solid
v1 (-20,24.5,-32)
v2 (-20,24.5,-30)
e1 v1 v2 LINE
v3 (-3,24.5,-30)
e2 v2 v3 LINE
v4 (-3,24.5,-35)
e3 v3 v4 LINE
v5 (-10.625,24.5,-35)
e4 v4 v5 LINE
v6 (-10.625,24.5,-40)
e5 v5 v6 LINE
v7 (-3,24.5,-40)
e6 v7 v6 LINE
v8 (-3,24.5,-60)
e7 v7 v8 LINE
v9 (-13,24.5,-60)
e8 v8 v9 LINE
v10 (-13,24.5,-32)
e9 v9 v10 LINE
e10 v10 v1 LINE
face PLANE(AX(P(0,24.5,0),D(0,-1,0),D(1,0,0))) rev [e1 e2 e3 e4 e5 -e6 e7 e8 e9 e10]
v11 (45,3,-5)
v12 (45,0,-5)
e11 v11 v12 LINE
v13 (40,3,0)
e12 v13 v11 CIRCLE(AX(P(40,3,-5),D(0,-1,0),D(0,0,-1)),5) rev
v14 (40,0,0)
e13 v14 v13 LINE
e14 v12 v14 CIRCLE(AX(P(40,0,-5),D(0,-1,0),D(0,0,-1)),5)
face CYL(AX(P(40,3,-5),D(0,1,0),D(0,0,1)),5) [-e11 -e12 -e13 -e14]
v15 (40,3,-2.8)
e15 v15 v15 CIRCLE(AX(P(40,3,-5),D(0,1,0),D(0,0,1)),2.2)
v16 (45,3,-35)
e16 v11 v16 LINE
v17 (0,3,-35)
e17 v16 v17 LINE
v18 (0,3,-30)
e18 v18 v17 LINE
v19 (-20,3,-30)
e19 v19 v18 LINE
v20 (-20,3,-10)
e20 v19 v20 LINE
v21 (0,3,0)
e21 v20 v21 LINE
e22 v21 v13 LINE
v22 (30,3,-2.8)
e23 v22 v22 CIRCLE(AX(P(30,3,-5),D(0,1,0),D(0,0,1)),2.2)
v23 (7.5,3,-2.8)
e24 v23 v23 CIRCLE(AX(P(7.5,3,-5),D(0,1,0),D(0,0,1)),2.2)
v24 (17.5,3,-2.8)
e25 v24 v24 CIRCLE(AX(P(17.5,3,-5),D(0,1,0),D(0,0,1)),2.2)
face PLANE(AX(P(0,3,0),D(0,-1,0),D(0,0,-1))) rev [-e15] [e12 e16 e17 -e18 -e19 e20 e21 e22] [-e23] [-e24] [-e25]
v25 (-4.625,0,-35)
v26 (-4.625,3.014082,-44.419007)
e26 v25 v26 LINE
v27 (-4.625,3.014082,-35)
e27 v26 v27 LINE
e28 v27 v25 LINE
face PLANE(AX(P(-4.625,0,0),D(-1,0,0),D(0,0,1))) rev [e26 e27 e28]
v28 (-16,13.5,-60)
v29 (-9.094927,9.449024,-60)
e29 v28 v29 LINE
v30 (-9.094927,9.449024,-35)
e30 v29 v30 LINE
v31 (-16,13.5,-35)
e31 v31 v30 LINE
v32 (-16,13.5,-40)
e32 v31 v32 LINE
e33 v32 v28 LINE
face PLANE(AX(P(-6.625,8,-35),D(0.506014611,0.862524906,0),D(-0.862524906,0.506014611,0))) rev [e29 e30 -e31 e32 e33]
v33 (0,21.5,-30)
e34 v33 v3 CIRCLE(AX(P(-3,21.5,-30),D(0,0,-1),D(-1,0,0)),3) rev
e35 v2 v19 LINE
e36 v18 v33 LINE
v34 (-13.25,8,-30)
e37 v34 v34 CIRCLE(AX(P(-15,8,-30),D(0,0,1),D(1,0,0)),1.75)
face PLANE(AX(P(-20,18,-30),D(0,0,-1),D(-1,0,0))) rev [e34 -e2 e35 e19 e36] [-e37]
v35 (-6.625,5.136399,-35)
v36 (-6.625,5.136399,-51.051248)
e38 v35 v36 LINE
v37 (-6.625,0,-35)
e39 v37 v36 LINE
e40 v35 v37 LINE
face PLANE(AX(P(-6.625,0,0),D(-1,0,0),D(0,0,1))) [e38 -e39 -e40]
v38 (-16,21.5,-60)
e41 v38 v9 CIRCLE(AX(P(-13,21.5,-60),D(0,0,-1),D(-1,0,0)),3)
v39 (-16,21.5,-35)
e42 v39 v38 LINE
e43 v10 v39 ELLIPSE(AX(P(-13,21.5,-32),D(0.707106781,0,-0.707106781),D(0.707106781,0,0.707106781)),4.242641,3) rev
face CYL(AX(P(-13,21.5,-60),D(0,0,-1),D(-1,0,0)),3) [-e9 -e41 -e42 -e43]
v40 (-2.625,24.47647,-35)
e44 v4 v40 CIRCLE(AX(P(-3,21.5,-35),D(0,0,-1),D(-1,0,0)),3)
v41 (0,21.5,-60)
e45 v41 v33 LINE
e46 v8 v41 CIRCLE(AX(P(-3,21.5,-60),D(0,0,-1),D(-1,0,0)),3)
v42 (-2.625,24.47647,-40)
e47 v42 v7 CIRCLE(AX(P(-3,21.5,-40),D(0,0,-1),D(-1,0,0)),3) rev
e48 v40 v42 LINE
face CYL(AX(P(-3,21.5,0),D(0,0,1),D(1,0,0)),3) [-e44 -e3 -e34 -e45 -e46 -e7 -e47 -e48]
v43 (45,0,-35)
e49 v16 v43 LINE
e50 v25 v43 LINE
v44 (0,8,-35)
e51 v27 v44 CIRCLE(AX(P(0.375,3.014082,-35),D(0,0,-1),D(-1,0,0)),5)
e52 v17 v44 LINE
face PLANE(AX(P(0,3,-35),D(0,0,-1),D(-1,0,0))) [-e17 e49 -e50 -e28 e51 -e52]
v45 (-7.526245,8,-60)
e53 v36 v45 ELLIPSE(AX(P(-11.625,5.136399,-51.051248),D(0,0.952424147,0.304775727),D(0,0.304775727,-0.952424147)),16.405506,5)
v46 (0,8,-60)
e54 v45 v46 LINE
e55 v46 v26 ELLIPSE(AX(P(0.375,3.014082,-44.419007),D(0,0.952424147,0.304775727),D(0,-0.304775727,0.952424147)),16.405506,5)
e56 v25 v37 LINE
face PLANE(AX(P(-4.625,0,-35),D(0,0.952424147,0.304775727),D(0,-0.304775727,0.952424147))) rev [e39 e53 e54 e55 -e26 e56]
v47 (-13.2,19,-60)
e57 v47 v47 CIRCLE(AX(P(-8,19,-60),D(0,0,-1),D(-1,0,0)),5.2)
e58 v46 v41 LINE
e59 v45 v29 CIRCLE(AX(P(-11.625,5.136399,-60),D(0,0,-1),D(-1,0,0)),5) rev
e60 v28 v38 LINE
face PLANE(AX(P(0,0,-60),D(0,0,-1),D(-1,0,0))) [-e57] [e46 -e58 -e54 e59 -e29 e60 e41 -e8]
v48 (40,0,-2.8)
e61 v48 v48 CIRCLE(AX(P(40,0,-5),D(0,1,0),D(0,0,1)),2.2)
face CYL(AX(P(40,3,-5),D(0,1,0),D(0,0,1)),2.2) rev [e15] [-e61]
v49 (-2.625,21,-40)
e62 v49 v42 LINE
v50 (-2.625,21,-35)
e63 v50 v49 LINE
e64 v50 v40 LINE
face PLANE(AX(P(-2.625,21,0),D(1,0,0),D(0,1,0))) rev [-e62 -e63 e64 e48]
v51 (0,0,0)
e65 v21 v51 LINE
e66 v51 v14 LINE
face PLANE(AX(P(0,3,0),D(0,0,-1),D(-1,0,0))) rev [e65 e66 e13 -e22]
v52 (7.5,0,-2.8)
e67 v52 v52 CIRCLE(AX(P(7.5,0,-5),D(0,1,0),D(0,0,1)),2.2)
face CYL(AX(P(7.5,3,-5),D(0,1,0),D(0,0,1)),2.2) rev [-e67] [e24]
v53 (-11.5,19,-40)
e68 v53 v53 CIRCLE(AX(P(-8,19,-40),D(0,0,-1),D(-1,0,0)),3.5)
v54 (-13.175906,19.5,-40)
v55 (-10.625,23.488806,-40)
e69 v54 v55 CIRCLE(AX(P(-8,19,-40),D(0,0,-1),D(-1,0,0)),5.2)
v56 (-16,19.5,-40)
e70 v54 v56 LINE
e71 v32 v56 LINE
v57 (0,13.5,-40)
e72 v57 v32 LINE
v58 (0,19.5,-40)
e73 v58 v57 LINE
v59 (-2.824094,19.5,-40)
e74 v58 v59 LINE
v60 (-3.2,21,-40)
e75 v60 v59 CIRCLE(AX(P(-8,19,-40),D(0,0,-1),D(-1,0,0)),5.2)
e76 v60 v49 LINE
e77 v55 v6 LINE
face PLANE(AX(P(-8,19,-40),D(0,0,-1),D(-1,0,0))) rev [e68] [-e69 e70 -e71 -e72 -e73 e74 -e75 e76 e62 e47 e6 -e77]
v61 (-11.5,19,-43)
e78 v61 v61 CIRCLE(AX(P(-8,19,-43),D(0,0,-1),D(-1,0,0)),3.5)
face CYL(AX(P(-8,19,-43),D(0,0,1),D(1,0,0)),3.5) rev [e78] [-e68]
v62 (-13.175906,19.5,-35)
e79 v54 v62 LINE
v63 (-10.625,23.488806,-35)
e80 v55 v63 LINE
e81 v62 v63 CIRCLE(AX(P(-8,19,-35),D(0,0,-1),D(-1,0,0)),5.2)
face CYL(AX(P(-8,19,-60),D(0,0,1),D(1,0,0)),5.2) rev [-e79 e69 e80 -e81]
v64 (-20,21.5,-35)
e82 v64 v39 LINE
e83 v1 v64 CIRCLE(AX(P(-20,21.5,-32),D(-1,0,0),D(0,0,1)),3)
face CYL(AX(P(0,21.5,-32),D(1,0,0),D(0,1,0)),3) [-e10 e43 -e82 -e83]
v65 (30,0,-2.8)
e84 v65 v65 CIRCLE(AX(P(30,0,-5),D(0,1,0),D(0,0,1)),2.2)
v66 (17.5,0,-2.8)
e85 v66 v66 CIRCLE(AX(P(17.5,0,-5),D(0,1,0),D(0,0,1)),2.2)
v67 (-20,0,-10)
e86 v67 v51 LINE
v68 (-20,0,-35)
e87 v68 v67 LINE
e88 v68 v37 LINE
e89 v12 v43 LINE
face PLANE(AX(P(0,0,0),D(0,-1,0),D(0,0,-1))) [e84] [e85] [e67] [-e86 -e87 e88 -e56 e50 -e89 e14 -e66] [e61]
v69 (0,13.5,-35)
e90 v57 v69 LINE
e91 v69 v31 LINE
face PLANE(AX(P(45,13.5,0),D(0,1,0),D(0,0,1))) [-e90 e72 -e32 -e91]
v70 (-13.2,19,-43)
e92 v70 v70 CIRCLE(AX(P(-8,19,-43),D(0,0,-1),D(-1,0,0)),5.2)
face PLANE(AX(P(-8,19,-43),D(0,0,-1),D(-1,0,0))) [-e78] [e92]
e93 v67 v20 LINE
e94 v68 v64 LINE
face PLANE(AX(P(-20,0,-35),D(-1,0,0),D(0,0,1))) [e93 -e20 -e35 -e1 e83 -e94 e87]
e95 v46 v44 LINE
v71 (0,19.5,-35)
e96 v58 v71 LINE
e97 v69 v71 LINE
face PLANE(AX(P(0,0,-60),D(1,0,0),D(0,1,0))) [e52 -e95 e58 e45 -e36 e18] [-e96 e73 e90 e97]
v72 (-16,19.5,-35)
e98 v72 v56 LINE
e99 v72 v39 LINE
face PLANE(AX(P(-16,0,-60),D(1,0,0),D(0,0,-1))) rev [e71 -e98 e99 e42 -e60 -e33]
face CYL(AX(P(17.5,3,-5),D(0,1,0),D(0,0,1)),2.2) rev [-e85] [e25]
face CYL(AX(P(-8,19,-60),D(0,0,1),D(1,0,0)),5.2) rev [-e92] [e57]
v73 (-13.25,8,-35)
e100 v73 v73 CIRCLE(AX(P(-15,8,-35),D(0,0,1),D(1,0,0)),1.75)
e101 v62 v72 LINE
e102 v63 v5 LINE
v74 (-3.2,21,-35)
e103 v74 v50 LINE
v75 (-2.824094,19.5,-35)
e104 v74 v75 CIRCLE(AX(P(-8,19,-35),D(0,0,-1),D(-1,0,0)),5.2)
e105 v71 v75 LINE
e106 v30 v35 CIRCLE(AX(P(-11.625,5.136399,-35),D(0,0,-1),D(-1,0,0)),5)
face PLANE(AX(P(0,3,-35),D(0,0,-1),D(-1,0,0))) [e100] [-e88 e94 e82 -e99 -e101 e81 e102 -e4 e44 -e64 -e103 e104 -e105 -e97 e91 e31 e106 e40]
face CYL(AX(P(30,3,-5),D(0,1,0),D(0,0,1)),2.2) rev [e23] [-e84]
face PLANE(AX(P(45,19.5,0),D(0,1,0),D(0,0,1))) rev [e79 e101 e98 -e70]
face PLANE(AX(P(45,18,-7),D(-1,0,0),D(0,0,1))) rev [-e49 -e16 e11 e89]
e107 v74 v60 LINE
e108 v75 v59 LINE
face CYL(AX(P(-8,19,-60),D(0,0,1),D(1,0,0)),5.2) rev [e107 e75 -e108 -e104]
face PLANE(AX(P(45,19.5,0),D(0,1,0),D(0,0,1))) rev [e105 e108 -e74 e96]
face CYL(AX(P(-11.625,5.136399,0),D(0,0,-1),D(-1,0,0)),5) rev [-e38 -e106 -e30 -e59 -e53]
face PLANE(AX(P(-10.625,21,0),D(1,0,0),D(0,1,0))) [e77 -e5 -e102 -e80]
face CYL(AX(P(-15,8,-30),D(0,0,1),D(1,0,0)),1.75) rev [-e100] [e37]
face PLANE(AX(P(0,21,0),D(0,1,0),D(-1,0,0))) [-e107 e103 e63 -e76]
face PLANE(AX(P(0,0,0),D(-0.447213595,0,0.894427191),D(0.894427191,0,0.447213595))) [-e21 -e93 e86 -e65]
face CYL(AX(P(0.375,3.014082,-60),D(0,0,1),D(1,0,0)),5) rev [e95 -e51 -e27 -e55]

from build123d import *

# Parameters (mm, degrees)
SKETCH_4_W              = 25
SKETCH_4_H              = 10
EXTRUDE_1_DEPTH         = 3
HOLE_WIZARD_4_4_4_4_1_D = 4.4
SKETCH_8_W              = 65
SKETCH_8_H              = 25
EXTRUDE_2_DEPTH         = 3
SKETCH_18_W             = 20
SKETCH_18_H             = 25
CUT_EXTRUDE_1_DEPTH     = 10
SKETCH_19_W             = 20
SKETCH_19_H             = 25
EXTRUDE_3_DEPTH         = 3
EXTRUDE_4_DEPTH         = 3
SKETCH_21_W             = 65
SKETCH_21_H             = 5
EXTRUDE_5_DEPTH         = 15
SKETCH_23_W             = 32.5
SKETCH_23_H             = 5
CUT_EXTRUDE_2_DEPTH     = 15
HOLE_WIZARD_3_5_3_5_1_D = 3.5
SKETCH_28_W             = 18
SKETCH_28_H             = 25
EXTRUDE_6_DEPTH         = 3
SKETCH_30_W             = 15
SKETCH_30_H             = 25
EXTRUDE_8_DEPTH         = 15
HOLE_WIZARD_1_D         = 10.2
EXTRUDE_9_DEPTH         = 3
EXTRUDE_10_DEPTH        = 3
HOLE_WIZARD_2_D         = 6
FILLET_4_R              = 3
SKETCH_39_W             = 18
SKETCH_39_H             = 28
CUT_EXTRUDE_3_DEPTH     = 75.283241717
SKETCH_40_W             = 32.5
SKETCH_40_H             = 15
EXTRUDE_11_DEPTH        = 5
EXTRUDE_START           = 25
EXTRUDE_12_DEPTH        = 25
EXTRUDE_START_2         = 3
SKETCH_45_R             = 5.2
SKETCH_45_R_2           = 3.5
EXTRUDE_15_DEPTH        = 3
SKETCH_46_W             = 5
SKETCH_46_H             = 3
CUT_EXTRUDE_4_DEPTH     = 90.140338792
SKETCH_50_W             = 8
SKETCH_50_H             = 5
CUT_EXTRUDE_5_DEPTH     = 4
CUT_EXTRUDE_6_DEPTH     = 25
CUT_EXTRUDE_7_DEPTH     = 25
EXTRUDE_16_DEPTH        = 2
FILLET_6_R              = 5
SKETCH_56_W             = 65.702290987
SKETCH_56_H             = 31.946087045
CUT_EXTRUDE_10_DEPTH    = 0.5
SKETCH_58_W             = 45
SKETCH_58_H             = 21.5
CUT_EXTRUDE_11_DEPTH    = 10
FILLET_7_R              = 3
EXTRUDE_17_DEPTH        = 3
HOLE_WIZARD_4_4_4_4_2_D = 4.4
FILLET_8_R              = 5


with BuildPart() as part:
    # 草图4 → 凸台-拉伸1 (new body)
    with BuildSketch(Plane(origin=(0, 0, 0), x_dir=(1, 0, 0), z_dir=(0, 1, 0))):
        with Locations((12.5, 5)):
            Rectangle(SKETCH_4_W, SKETCH_4_H)
    extrude(amount=EXTRUDE_1_DEPTH)

    # Ø4.4 (4.4) 直径孔1 (through all)
    with Locations(Plane(origin=(0, 3, 0), x_dir=(1, 0, 0), z_dir=(0, 1, 0))):
        with Locations((7.5, 5), (17.5, 5)):
            Hole(HOLE_WIZARD_4_4_4_4_1_D / 2)

    # 草图8 → 凸台-拉伸2 (add)
    with BuildSketch(Plane.XZ):
        with Locations((32.5, -22.5)):
            Rectangle(SKETCH_8_W, SKETCH_8_H)
    extrude(amount=-EXTRUDE_2_DEPTH)

    # 草图18 → 切除-拉伸1 (cut)
    with BuildSketch(Plane(origin=(0, 3, 0), x_dir=(1, 0, 0), z_dir=(0, 1, 0))):
        with Locations((55, 22.5)):
            Rectangle(SKETCH_18_W, SKETCH_18_H)
    extrude(amount=-CUT_EXTRUDE_1_DEPTH, mode=Mode.SUBTRACT)

    # 草图19 → 凸台-拉伸3 (add)
    with BuildSketch(Plane(origin=(0, 3, 0), x_dir=(1, 0, 0), z_dir=(0, 1, 0))):
        with Locations((-10, 22.5)):
            Rectangle(SKETCH_19_W, SKETCH_19_H)
    extrude(amount=-EXTRUDE_3_DEPTH)

    # 草图20 → 凸台-拉伸4 (add)
    with BuildSketch(Plane(origin=(0, 3, 0), x_dir=(1, 0, 0), z_dir=(0, 1, 0))):
        Polygon((-20, 10), (0, 10), (0, 0), align=None)
        Polygon((25, 10), (45, 10), (25, 0), align=None)
    extrude(amount=-EXTRUDE_4_DEPTH)

    # 草图21 → 凸台-拉伸5 (add)
    with BuildSketch(Plane(origin=(0, 3, 0), x_dir=(1, 0, 0), z_dir=(0, 1, 0))):
        with Locations((12.5, 32.5)):
            Rectangle(SKETCH_21_W, SKETCH_21_H)
    extrude(amount=EXTRUDE_5_DEPTH)

    # 草图23 → 切除-拉伸2 (cut)
    with BuildSketch(Plane(origin=(0, 18, 0), x_dir=(1, 0, 0), z_dir=(0, 1, 0))):
        with Locations((28.75, 32.5)):
            Rectangle(SKETCH_23_W, SKETCH_23_H)
    extrude(amount=-CUT_EXTRUDE_2_DEPTH, mode=Mode.SUBTRACT)

    # Ø3.5 (3.5) 直径孔1 (through all)
    with Locations(Plane.XY.offset(-30)):
        with Locations((-15, 8)):
            Hole(HOLE_WIZARD_3_5_3_5_1_D / 2)

    # 草图28 → 凸台-拉伸6 (add)
    with BuildSketch(Plane(origin=(0, 3, 0), x_dir=(1, 0, 0), z_dir=(0, 1, 0))):
        with Locations((54, 22.5)):
            Rectangle(SKETCH_28_W, SKETCH_28_H)
    extrude(amount=-EXTRUDE_6_DEPTH)

    # 草图30 → 凸台-拉伸8 (add)
    with BuildSketch(Plane(origin=(0, 3, 0), x_dir=(1, 0, 0), z_dir=(0, 1, 0))):
        with Locations((55.5, 22.5)):
            Rectangle(SKETCH_30_W, SKETCH_30_H)
    extrude(amount=EXTRUDE_8_DEPTH)

    # 孔1 (through all)
    with Locations(Plane(origin=(0, 0, -35), x_dir=(-1, 0, 0), z_dir=(0, 0, -1))):
        with Locations((-55.5, 10.5)):
            Hole(HOLE_WIZARD_1_D / 2)

    # 草图35 → 凸台-拉伸9 (add)
    with BuildSketch(Plane.XY.offset(-10)):
        Polygon((48, 18), (45, 3), (45, 0), (63, 0), (63, 18), align=None)
    extrude(amount=EXTRUDE_9_DEPTH)

    # 草图36 → 凸台-拉伸10 (add)
    with BuildSketch(Plane(origin=(0, 3, 0), x_dir=(1, 0, 0), z_dir=(0, 1, 0))):
        Polygon((25, 0), (45, 7), (45, 10), align=None)
    extrude(amount=-EXTRUDE_10_DEPTH)

    # 孔2 (through all)
    with Locations(Plane(origin=(0, 0, -10), x_dir=(-1, 0, 0), z_dir=(0, 0, -1))):
        with Locations((-55.5, 10.5)):
            Hole(HOLE_WIZARD_2_D / 2)

    # 圆角4
    fillet_4_edges = [part.edges().sort_by_distance(p)[0] for p in [
        (63, 18, -21),
    ]]
    fillet(fillet_4_edges, radius=FILLET_4_R)

    # 草图39 → 切除-拉伸3 (cut, through all)
    with BuildSketch(Plane.XZ):
        with Locations((54, -21)):
            Rectangle(SKETCH_39_W, SKETCH_39_H)
    extrude(amount=-CUT_EXTRUDE_3_DEPTH, mode=Mode.SUBTRACT)

    # 草图40 → 凸台-拉伸11 (add)
    with BuildSketch(Plane(origin=(0, 0, -35), x_dir=(-1, 0, 0), z_dir=(0, 0, -1))):
        with Locations((-28.75, 10.5)):
            Rectangle(SKETCH_40_W, SKETCH_40_H)
        Polygon((-12.5, 18), (20, 18), (20, 25), (-45, 25), (-45, 18), align=None)
    extrude(amount=-EXTRUDE_11_DEPTH)

    # 草图41 → 凸台-拉伸12 (add)
    with BuildSketch(Plane(origin=(0, 0, -35), x_dir=(-1, 0, 0), z_dir=(0, 0, -1)).offset(EXTRUDE_START)):
        with BuildLine():
            Line((8, 8), (13.25, 8))
            ThreePointArc((13.25, 8), (14.189907413, 9.551209206), (16, 9.436140662))
            Line((16, 9.436140662), (16, 25))
            Line((16, 25), (0, 25))
            Line((0, 25), (0, 8))
            Line((0, 8), (8, 8))
        make_face()
        with BuildLine():
            ThreePointArc((13.2, 19), (11.676955262, 15.323044738), (8, 13.8))
            ThreePointArc((8, 13.8), (4.323044738, 22.676955262), (13.2, 19))
        make_face(mode=Mode.SUBTRACT)
    extrude(amount=-EXTRUDE_12_DEPTH)

    # 草图45 → 凸台-拉伸15 (add)
    with BuildSketch(Plane(origin=(0, 0, -40), x_dir=(-1, 0, 0), z_dir=(0, 0, -1)).offset(EXTRUDE_START_2)):
        with Locations((8, 19)):
            Circle(SKETCH_45_R)
        with Locations((8, 19)):
            Circle(SKETCH_45_R_2, mode=Mode.SUBTRACT)
    extrude(amount=-EXTRUDE_15_DEPTH)

    # 草图46 → 切除-拉伸4 (cut, through all)
    with BuildSketch(Plane.ZY.offset(16)):
        with Locations((-37.5, 18)):
            Rectangle(SKETCH_46_W, SKETCH_46_H)
        with Locations((-37.5, 15)):
            Rectangle(SKETCH_46_W, SKETCH_46_H)
    extrude(amount=-CUT_EXTRUDE_4_DEPTH, mode=Mode.SUBTRACT)

    # 草图50 → 切除-拉伸5 (cut)
    with BuildSketch(Plane(origin=(0, 25, 0), x_dir=(1, 0, 0), z_dir=(0, 1, 0))):
        with Locations((-6.625, 37.5)):
            Rectangle(SKETCH_50_W, SKETCH_50_H)
    extrude(amount=-CUT_EXTRUDE_5_DEPTH, mode=Mode.SUBTRACT)

    # 草图51 → 切除-拉伸6 (cut)
    with BuildSketch(Plane(origin=(0, 0, -60), x_dir=(-1, 0, 0), z_dir=(0, 0, -1))):
        Polygon((16, 13.5), (10.5, 8), (16, 8), align=None)
    extrude(amount=-CUT_EXTRUDE_6_DEPTH, mode=Mode.SUBTRACT)

    # 草图52 → 切除-拉伸7 (cut)
    with BuildSketch(Plane(origin=(0, 0, -60), x_dir=(-1, 0, 0), z_dir=(0, 0, -1))):
        Polygon((6.625, 8), (16, 13.5), (10.5, 8), align=None)
    extrude(amount=-CUT_EXTRUDE_7_DEPTH, mode=Mode.SUBTRACT)

    # 草图54 → 凸台-拉伸16 (add)
    with BuildSketch(Plane(origin=(-6.625, 0, 0), x_dir=(0, 0, -1), z_dir=(1, 0, 0))):
        Polygon((35, 0), (60, 8), (35, 8), align=None)
    extrude(amount=EXTRUDE_16_DEPTH)

    # 圆角6
    # the kernel refuses this fillet: 5 mm, written as the material it adds along each edge
    with BuildSketch(Plane(origin=(-6.625, 8, -60), x_dir=(-0.8625249057662363, 0.5060146113828583, 0), z_dir=(0, 0, 1))) as fillet_6_piece_1_section:
        with BuildLine():
            CenterArc((FILLET_6_R * 0.572720144444, FILLET_6_R), FILLET_6_R, 210.398727714, 59.601272286)
            Line((-FILLET_6_R * 0.289804761322, FILLET_6_R * 0.493985388617), (0, 0))
            Line((0, 0), (FILLET_6_R * 0.572720144444, 0))
        make_face()
    fillet_6_piece_1 = extrude(amount=32.159001806, mode=Mode.PRIVATE)
    fillet_6_piece_1 = split(fillet_6_piece_1, bisect_by=Plane(origin=(-6.625, 8, -30), z_dir=(0, 0, -1)), keep=Keep.TOP, mode=Mode.PRIVATE)
    fillet_6_piece_1 = split(fillet_6_piece_1, bisect_by=Plane(origin=(-6.625, 8, -60), z_dir=(0, 0.9524241471993243, 0.3047757271037836)), keep=Keep.TOP, mode=Mode.PRIVATE)
    add(fillet_6_piece_1)
    with BuildSketch(Plane(origin=(-4.625, 8, -72.464794172), x_dir=(0, -1, 0), z_dir=(0, 0, 1))) as fillet_6_piece_2_section:
        with BuildLine():
            CenterArc((4.985917669, 5), FILLET_6_R, 184.301222305, 85.698777695)
            Line((0, 4.625), (0, 0))
            Line((0, 0), (4.985917669, 0))
        make_face()
    fillet_6_piece_2 = extrude(amount=49.929588344, mode=Mode.PRIVATE)
    fillet_6_piece_2 = split(fillet_6_piece_2, bisect_by=Plane(origin=(-4.625, 8, -30), z_dir=(0, 0, -1)), keep=Keep.TOP, mode=Mode.PRIVATE)
    fillet_6_piece_2 = split(fillet_6_piece_2, bisect_by=Plane(origin=(-4.625, 11.618227626, -71.306961332), z_dir=(0, 0.9524241471993243, 0.3047757271037836)), keep=Keep.TOP, mode=Mode.PRIVATE)
    add(fillet_6_piece_2)

    # 草图56 → 切除-拉伸10 (cut)
    with BuildSketch(Plane(origin=(0, 25, 0), x_dir=(1, 0, 0), z_dir=(0, 1, 0))):
        with Locations((12.851145494, 45.973043523)):
            Rectangle(SKETCH_56_W, SKETCH_56_H)
    extrude(amount=-CUT_EXTRUDE_10_DEPTH, mode=Mode.SUBTRACT)

    # 草图58 → 切除-拉伸11 (cut)
    with BuildSketch(Plane(origin=(0, 0, -35), x_dir=(-1, 0, 0), z_dir=(0, 0, -1))):
        with Locations((-22.5, 13.75)):
            Rectangle(SKETCH_58_W, SKETCH_58_H)
    extrude(amount=-CUT_EXTRUDE_11_DEPTH, mode=Mode.SUBTRACT)

    # 圆角7
    # the kernel refuses this fillet: 3 mm, written as the material it takes off along each edge
    with BuildSketch(Plane(origin=(0, 24.5, -67.5), x_dir=(0, -1, 0), z_dir=(0, 0, 1))) as fillet_7_piece_1:
        with BuildLine():
            CenterArc((FILLET_7_R, -FILLET_7_R), FILLET_7_R, 90, 90)
            Line((0, -FILLET_7_R), (0, 0))
            Line((0, 0), (FILLET_7_R, 0))
        make_face()
    extrude(amount=45, mode=Mode.SUBTRACT)
    with BuildSketch(Plane(origin=(-16, 24.5, -35), x_dir=(0, -1, 0), z_dir=(0, 0, -1))) as fillet_7_piece_2:
        with BuildLine():
            CenterArc((FILLET_7_R, -FILLET_7_R), FILLET_7_R, 90, 90)
            Line((0, -FILLET_7_R), (0, 0))
            Line((0, 0), (FILLET_7_R, 0))
        make_face()
    extrude(amount=32.5, mode=Mode.SUBTRACT)
    with BuildSketch(Plane(origin=(-16, 24.5, -35), x_dir=(0, -1, 0), z_dir=(-1, 0, 0))) as fillet_7_piece_3:
        with BuildLine():
            CenterArc((FILLET_7_R, FILLET_7_R), FILLET_7_R, 180, 90)
            Line((0, FILLET_7_R), (0, 0))
            Line((0, 0), (FILLET_7_R, 0))
        make_face()
    extrude(amount=11.5, mode=Mode.SUBTRACT)
    with BuildSketch(Plane(origin=(-16, 24.5, -27.5), x_dir=(0, -1, 0), z_dir=(0, 0, -1))) as fillet_7_piece_4a_section:
        with BuildLine():
            CenterArc((FILLET_7_R, -FILLET_7_R), FILLET_7_R, 90, 90)
            Line((0, -FILLET_7_R), (0, 0))
            Line((0, 0), (FILLET_7_R, 0))
        make_face()
    fillet_7_piece_4a = extrude(amount=32.5, mode=Mode.PRIVATE)
    fillet_7_piece_4a = split(fillet_7_piece_4a, bisect_by=Plane(origin=(-16, 24.5, -35), z_dir=(0, 0, 1)), keep=Keep.TOP, mode=Mode.PRIVATE)
    fillet_7_piece_4a = split(fillet_7_piece_4a, bisect_by=Plane(origin=(-16, 24.5, -30), z_dir=(0, 0, -1)), keep=Keep.TOP, mode=Mode.PRIVATE)
    with BuildSketch(Plane(origin=(-8.5, 24.5, -35), x_dir=(0, -1, 0), z_dir=(-1, 0, 0))) as fillet_7_piece_4b_section:
        with BuildLine():
            CenterArc((FILLET_7_R, FILLET_7_R), FILLET_7_R, 180, 90)
            Line((0, FILLET_7_R), (0, 0))
            Line((0, 0), (FILLET_7_R, 0))
        make_face()
    fillet_7_piece_4b = extrude(amount=11.5, mode=Mode.PRIVATE)
    fillet_7_piece_4b = split(fillet_7_piece_4b, bisect_by=Plane(origin=(-16, 24.5, -35), z_dir=(1, 0, 0)), keep=Keep.TOP, mode=Mode.PRIVATE)
    fillet_7_piece_4b = fillet_7_piece_4b - Plane(origin=(-8, 19, -35), x_dir=(-1, 0, 0), z_dir=(0, 0, -1)) * Cylinder(5.2, 35, mode=Mode.PRIVATE)
    fillet_7_piece_4b = split(fillet_7_piece_4b, bisect_by=Plane(origin=(-10.625, 24.5, -35), z_dir=(-1, 0, 0)), keep=Keep.TOP, mode=Mode.PRIVATE)
    fillet_7_piece_4 = fillet_7_piece_4a & fillet_7_piece_4b
    add(fillet_7_piece_4, mode=Mode.SUBTRACT)

    # 草图60 → 凸台-拉伸17 (add)
    with BuildSketch(Plane(origin=(0, 3, 0), x_dir=(1, 0, 0), z_dir=(0, 1, 0))):
        Polygon((45, 7), (45, 0), (25, 0), align=None)
    extrude(amount=-EXTRUDE_17_DEPTH)

    # Ø4.4 (4.4) 直径孔2 (through all)
    with Locations(Plane(origin=(0, 3, 0), x_dir=(1, 0, 0), z_dir=(0, 1, 0))):
        with Locations((30, 5), (40, 5)):
            Hole(HOLE_WIZARD_4_4_4_4_2_D / 2)

    # 圆角8
    fillet_8_edges = [part.edges().sort_by_distance(p)[0] for p in [
        (45, 1.5, 0),
    ]]
    fillet(fillet_8_edges, radius=FILLET_8_R)


solid = part.part
